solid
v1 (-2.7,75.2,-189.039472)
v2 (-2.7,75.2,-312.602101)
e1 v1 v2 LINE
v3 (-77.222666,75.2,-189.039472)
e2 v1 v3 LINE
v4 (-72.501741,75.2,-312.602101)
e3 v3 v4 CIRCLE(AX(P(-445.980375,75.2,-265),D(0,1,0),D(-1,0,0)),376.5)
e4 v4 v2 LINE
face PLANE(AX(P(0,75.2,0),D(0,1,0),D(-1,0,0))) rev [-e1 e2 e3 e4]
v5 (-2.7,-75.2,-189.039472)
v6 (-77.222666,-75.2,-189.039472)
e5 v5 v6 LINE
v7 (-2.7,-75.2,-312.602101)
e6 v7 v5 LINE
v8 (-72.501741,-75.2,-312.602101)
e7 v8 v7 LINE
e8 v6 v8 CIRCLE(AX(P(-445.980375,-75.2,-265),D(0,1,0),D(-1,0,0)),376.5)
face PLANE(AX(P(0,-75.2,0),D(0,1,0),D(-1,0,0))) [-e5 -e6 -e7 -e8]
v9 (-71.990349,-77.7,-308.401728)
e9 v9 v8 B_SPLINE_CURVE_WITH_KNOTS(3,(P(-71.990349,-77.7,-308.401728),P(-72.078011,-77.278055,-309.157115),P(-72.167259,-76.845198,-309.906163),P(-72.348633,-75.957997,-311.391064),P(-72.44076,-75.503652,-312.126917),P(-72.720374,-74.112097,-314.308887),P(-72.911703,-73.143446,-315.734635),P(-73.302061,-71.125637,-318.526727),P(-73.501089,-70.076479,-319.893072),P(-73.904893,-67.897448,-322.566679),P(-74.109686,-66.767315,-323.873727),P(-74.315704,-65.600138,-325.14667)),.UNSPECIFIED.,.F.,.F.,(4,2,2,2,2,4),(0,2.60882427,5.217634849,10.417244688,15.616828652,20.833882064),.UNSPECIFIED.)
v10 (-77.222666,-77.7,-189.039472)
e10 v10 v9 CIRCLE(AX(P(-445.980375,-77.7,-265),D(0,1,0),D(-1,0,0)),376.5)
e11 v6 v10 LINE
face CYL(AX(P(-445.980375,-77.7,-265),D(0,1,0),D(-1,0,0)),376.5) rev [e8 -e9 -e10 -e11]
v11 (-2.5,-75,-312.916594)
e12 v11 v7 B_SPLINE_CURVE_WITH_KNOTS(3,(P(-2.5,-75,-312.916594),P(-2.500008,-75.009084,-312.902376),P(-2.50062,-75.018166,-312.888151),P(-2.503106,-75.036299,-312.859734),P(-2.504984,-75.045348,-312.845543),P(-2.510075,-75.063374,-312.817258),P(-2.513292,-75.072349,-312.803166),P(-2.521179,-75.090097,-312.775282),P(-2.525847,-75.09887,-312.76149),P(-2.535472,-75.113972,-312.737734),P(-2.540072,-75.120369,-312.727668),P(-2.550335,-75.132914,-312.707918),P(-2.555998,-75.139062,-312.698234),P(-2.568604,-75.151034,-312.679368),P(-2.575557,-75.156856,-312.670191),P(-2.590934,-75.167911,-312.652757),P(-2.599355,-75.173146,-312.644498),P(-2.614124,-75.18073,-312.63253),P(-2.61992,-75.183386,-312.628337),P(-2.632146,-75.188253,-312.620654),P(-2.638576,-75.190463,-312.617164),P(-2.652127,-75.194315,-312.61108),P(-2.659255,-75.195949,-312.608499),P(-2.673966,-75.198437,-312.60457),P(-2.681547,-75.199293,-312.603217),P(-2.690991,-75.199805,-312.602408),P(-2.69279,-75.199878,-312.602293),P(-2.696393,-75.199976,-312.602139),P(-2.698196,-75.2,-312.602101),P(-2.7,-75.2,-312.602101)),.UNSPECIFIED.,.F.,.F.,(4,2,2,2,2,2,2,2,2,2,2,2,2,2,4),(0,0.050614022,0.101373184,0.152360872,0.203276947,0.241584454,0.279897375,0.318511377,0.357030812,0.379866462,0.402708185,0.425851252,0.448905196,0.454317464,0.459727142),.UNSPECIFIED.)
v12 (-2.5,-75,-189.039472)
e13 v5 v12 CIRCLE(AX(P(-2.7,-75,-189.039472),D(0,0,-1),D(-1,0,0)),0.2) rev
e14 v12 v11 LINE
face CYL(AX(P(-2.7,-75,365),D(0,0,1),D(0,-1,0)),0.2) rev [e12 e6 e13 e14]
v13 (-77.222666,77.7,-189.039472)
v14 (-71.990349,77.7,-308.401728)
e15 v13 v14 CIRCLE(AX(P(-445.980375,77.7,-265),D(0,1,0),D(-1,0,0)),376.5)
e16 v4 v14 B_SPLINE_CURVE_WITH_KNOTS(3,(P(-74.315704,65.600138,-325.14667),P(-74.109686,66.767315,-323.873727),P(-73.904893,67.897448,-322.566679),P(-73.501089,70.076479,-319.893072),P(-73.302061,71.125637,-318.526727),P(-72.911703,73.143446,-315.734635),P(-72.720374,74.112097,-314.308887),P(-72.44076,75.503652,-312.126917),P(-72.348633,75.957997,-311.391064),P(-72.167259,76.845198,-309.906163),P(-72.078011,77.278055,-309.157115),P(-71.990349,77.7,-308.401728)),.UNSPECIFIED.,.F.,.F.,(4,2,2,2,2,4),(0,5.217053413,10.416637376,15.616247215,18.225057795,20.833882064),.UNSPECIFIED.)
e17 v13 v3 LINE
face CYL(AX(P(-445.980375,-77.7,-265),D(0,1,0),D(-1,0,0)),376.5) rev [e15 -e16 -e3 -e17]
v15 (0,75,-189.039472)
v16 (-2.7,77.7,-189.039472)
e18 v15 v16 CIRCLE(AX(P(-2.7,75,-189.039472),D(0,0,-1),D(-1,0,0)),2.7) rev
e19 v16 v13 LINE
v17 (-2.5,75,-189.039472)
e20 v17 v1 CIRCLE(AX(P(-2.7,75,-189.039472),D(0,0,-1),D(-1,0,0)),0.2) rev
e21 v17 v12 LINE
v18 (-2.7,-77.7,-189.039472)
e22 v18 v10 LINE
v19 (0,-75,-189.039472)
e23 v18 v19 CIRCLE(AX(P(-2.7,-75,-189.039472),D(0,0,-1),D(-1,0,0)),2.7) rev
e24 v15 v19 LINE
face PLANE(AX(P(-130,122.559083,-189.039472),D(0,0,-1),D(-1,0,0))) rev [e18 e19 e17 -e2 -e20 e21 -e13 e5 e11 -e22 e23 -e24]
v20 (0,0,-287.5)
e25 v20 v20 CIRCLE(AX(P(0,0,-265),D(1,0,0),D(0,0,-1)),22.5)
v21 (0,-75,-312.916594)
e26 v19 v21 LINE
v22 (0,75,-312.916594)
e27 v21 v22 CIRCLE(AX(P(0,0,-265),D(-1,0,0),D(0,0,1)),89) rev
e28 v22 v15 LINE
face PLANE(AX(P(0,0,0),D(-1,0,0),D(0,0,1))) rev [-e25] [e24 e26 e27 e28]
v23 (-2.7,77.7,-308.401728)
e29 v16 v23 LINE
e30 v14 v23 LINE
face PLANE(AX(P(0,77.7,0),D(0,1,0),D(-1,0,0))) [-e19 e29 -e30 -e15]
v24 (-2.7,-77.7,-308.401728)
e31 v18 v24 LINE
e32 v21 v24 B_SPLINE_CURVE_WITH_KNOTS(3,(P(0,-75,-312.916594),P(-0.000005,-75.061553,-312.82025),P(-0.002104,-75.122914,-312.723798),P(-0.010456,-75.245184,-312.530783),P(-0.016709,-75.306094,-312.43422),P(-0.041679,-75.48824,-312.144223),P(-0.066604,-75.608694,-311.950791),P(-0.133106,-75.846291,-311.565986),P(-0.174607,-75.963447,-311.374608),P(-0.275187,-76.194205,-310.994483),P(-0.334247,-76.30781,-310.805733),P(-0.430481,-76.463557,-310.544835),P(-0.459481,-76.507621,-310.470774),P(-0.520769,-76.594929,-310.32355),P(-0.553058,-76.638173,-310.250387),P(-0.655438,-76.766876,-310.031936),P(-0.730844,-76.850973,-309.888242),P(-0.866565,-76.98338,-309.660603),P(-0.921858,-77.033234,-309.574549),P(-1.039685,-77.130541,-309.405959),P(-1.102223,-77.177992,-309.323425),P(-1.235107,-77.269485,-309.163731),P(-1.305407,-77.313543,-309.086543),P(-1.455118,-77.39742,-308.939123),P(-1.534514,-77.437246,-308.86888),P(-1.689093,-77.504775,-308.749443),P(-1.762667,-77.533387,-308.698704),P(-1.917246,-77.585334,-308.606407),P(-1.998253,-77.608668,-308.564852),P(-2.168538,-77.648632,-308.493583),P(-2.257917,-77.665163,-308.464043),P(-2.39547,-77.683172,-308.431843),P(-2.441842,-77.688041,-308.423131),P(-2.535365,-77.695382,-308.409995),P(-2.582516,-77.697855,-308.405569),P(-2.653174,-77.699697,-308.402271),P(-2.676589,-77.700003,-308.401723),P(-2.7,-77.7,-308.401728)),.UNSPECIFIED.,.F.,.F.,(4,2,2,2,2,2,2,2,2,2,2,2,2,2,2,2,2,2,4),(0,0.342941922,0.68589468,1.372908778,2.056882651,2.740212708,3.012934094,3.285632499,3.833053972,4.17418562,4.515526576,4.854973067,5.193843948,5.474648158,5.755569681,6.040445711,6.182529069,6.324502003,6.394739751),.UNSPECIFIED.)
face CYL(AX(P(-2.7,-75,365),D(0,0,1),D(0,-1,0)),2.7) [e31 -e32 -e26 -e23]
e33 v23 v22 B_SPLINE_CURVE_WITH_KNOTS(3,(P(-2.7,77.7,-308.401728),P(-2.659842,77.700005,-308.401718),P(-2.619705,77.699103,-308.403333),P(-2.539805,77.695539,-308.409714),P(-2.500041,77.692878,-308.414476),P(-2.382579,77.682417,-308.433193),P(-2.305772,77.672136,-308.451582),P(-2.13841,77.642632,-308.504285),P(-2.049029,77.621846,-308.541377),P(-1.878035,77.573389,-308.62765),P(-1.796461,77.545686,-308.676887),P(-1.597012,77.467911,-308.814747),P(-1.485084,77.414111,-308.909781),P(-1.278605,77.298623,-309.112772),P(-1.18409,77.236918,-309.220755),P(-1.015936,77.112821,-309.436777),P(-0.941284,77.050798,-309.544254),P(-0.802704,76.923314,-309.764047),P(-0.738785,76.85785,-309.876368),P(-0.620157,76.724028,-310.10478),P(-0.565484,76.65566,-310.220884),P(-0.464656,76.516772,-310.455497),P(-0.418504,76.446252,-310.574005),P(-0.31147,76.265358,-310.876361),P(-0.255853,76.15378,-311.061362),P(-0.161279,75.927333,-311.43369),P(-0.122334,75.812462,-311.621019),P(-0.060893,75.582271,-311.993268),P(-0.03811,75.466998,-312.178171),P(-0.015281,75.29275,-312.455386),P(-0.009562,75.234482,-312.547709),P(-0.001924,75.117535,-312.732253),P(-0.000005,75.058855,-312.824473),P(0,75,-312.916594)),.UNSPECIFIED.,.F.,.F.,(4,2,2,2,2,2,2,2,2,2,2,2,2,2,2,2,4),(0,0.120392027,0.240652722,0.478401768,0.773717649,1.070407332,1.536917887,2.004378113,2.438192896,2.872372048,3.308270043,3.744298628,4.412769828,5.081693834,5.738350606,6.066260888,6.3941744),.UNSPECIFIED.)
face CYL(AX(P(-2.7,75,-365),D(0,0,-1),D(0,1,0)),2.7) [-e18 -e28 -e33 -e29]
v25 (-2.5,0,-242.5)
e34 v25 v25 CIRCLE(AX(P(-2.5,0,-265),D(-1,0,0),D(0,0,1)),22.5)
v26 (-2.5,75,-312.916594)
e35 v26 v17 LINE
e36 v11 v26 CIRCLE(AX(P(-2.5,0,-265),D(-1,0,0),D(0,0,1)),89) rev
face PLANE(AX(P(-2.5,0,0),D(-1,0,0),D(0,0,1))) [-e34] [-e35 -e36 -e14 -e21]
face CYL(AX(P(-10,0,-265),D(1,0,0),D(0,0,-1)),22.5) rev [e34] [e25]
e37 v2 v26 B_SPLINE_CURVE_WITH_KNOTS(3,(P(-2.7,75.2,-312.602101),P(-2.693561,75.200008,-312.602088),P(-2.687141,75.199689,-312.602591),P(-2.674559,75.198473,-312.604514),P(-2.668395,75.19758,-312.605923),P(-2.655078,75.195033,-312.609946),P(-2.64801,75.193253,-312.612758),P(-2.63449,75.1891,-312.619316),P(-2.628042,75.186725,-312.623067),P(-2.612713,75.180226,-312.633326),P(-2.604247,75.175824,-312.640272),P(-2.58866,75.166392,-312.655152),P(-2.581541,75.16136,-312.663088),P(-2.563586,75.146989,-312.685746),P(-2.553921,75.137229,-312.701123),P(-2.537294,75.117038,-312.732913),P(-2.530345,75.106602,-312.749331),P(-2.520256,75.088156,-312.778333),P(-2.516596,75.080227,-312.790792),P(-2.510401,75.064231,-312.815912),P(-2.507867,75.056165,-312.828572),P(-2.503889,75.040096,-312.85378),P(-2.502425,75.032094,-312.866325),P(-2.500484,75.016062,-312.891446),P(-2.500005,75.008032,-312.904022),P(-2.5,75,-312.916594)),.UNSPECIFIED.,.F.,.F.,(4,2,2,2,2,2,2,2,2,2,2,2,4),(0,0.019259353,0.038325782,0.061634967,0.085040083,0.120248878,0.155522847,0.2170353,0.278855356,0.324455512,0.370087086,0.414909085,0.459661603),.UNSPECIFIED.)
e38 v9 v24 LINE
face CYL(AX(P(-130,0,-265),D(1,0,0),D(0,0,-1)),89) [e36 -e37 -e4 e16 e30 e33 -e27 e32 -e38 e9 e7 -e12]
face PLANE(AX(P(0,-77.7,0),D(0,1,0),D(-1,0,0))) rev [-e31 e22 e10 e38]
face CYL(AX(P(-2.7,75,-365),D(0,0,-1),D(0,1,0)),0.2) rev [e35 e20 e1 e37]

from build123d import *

# Parameters (mm, degrees)
SKETCH1_W               = 730
SKETCH1_H               = 150
BASE_FLANGE1_DEPTH      = 2.5
EDGE_FLANGE1_DEPTH      = 730
EDGE_FLANGE1_BEND_DEPTH = 730
SKETCH13_R              = 22.5
CUT_EXTRUDE2_DEPTH      = 10
CUT_EXTRUDE3_DEPTH      = 396.173746598
CUT_EXTRUDE3_DEPTH_BACK = 396.173746598
SKETCH14_W              = 631.337566112
SKETCH14_H              = 273.157514278
CUT_EXTRUDE4_DEPTH      = 396.173746598
CUT_EXTRUDE4_DEPTH_BACK = 396.173746598
CUT_EXTRUDE5_DEPTH      = 408.87885472


# Sheet-metal steps are written as plain solids
with BuildPart() as part:
    # Sketch1 → Base-Flange1 (new body)
    with BuildSketch(Plane(origin=(0, 0, 0), x_dir=(0, 0, -1), z_dir=(1, 0, 0))):
        Rectangle(SKETCH1_W, SKETCH1_H)
    extrude(amount=-BASE_FLANGE1_DEPTH)

    # Edge-Flange1 section (across the edge) → Edge-Flange1 (add)
    with BuildSketch(Plane(origin=(-2.5, 75.2, 365), x_dir=(0, -1, 0), z_dir=(0, 0, -1))):
        with BuildLine():
            Line((-2.5, 0.2), (-2.5, 127.5))
            Line((-2.5, 127.5), (0, 127.5))
            Line((0, 127.5), (0, 0.2))
            ThreePointArc((0, 0.2), (0.058578644, 0.058578644), (0.2, 0))
            Line((0.2, 0), (0.2, -2.5))
            ThreePointArc((0.2, -2.5), (-1.709188309, -1.709188309), (-2.5, 0.2))
        make_face()
    extrude(amount=EDGE_FLANGE1_DEPTH)

    # Edge-Flange1 section 2 (across the edge) → Edge-Flange1 bend (add)
    with BuildSketch(Plane(origin=(-2.5, -75.2, -365), x_dir=(0, 1, 0), z_dir=(0, 0, 1))):
        with BuildLine():
            Line((-2.5, 0.2), (-2.5, 127.5))
            Line((-2.5, 127.5), (0, 127.5))
            Line((0, 127.5), (0, 0.2))
            ThreePointArc((0, 0.2), (0.058578644, 0.058578644), (0.2, 0))
            Line((0.2, 0), (0.2, -2.5))
            ThreePointArc((0.2, -2.5), (-1.709188309, -1.709188309), (-2.5, 0.2))
        make_face()
    extrude(amount=EDGE_FLANGE1_BEND_DEPTH)

    # Sketch13 → Cut-Extrude2 (cut)
    with BuildSketch(Plane(origin=(0, 0, 0), x_dir=(0, 0, -1), z_dir=(1, 0, 0))):
        with Locations((265, 0)):
            Circle(SKETCH13_R)
        with Locations((-290, 0)):
            Circle(SKETCH13_R)
    extrude(amount=-CUT_EXTRUDE2_DEPTH, mode=Mode.SUBTRACT)

    # Sketch14 → Cut-Extrude3 (cut, two sides: drawn at the far end of the back side and taken through both)
    with BuildSketch(Plane(origin=(0, 0, 0), x_dir=(0, 0, -1), z_dir=(1, 0, 0)).offset(-CUT_EXTRUDE3_DEPTH_BACK)):
        with Locations((-126.629311255, -14.019673746)):
            Rectangle(SKETCH14_W, SKETCH14_H)
    extrude(amount=CUT_EXTRUDE3_DEPTH + CUT_EXTRUDE3_DEPTH_BACK, mode=Mode.SUBTRACT)

    # Sketch15 → Cut-Extrude4 (cut, two sides: drawn at the far end of the back side and taken through both)
    with BuildSketch(Plane(origin=(0, 0, 0), x_dir=(0, 0, -1), z_dir=(1, 0, 0)).offset(-CUT_EXTRUDE4_DEPTH_BACK)):
        with BuildLine():
            Line((302.266550641, 80.822052704), (310.532003477, 105.351783703))
            Line((310.532003477, 105.351783703), (400.668447303, 94.566226322))
            Line((400.668447303, 94.566226322), (380.252927975, -108.048173048))
            Line((380.252927975, -108.048173048), (291.286888445, -85.029403714))
            ThreePointArc((291.286888445, -85.029403714), (353.805609642, -5.879089735), (302.266550641, 80.822052704))
        make_face()
    extrude(amount=CUT_EXTRUDE4_DEPTH + CUT_EXTRUDE4_DEPTH_BACK, mode=Mode.SUBTRACT)

    # Sketch17 → Cut-Extrude5 (cut, through all)
    with BuildSketch(Plane(origin=(0, 77.7, 0), x_dir=(1, 0, 0), z_dir=(0, 1, 0))):
        with BuildLine():
            Line((-169.942990536, 157.436912633), (-165.65841416, 335.00880021))
            Line((-165.65841416, 335.00880021), (-74.315703794, 325.146670386))
            ThreePointArc((-74.315703794, 325.146670386), (-69.663025193, 253.273874783), (-78.78147448, 181.830190328))
            Line((-78.78147448, 181.830190328), (-169.942990536, 157.436912633))
        make_face()
    extrude(amount=-CUT_EXTRUDE5_DEPTH, mode=Mode.SUBTRACT)


solid = part.part
